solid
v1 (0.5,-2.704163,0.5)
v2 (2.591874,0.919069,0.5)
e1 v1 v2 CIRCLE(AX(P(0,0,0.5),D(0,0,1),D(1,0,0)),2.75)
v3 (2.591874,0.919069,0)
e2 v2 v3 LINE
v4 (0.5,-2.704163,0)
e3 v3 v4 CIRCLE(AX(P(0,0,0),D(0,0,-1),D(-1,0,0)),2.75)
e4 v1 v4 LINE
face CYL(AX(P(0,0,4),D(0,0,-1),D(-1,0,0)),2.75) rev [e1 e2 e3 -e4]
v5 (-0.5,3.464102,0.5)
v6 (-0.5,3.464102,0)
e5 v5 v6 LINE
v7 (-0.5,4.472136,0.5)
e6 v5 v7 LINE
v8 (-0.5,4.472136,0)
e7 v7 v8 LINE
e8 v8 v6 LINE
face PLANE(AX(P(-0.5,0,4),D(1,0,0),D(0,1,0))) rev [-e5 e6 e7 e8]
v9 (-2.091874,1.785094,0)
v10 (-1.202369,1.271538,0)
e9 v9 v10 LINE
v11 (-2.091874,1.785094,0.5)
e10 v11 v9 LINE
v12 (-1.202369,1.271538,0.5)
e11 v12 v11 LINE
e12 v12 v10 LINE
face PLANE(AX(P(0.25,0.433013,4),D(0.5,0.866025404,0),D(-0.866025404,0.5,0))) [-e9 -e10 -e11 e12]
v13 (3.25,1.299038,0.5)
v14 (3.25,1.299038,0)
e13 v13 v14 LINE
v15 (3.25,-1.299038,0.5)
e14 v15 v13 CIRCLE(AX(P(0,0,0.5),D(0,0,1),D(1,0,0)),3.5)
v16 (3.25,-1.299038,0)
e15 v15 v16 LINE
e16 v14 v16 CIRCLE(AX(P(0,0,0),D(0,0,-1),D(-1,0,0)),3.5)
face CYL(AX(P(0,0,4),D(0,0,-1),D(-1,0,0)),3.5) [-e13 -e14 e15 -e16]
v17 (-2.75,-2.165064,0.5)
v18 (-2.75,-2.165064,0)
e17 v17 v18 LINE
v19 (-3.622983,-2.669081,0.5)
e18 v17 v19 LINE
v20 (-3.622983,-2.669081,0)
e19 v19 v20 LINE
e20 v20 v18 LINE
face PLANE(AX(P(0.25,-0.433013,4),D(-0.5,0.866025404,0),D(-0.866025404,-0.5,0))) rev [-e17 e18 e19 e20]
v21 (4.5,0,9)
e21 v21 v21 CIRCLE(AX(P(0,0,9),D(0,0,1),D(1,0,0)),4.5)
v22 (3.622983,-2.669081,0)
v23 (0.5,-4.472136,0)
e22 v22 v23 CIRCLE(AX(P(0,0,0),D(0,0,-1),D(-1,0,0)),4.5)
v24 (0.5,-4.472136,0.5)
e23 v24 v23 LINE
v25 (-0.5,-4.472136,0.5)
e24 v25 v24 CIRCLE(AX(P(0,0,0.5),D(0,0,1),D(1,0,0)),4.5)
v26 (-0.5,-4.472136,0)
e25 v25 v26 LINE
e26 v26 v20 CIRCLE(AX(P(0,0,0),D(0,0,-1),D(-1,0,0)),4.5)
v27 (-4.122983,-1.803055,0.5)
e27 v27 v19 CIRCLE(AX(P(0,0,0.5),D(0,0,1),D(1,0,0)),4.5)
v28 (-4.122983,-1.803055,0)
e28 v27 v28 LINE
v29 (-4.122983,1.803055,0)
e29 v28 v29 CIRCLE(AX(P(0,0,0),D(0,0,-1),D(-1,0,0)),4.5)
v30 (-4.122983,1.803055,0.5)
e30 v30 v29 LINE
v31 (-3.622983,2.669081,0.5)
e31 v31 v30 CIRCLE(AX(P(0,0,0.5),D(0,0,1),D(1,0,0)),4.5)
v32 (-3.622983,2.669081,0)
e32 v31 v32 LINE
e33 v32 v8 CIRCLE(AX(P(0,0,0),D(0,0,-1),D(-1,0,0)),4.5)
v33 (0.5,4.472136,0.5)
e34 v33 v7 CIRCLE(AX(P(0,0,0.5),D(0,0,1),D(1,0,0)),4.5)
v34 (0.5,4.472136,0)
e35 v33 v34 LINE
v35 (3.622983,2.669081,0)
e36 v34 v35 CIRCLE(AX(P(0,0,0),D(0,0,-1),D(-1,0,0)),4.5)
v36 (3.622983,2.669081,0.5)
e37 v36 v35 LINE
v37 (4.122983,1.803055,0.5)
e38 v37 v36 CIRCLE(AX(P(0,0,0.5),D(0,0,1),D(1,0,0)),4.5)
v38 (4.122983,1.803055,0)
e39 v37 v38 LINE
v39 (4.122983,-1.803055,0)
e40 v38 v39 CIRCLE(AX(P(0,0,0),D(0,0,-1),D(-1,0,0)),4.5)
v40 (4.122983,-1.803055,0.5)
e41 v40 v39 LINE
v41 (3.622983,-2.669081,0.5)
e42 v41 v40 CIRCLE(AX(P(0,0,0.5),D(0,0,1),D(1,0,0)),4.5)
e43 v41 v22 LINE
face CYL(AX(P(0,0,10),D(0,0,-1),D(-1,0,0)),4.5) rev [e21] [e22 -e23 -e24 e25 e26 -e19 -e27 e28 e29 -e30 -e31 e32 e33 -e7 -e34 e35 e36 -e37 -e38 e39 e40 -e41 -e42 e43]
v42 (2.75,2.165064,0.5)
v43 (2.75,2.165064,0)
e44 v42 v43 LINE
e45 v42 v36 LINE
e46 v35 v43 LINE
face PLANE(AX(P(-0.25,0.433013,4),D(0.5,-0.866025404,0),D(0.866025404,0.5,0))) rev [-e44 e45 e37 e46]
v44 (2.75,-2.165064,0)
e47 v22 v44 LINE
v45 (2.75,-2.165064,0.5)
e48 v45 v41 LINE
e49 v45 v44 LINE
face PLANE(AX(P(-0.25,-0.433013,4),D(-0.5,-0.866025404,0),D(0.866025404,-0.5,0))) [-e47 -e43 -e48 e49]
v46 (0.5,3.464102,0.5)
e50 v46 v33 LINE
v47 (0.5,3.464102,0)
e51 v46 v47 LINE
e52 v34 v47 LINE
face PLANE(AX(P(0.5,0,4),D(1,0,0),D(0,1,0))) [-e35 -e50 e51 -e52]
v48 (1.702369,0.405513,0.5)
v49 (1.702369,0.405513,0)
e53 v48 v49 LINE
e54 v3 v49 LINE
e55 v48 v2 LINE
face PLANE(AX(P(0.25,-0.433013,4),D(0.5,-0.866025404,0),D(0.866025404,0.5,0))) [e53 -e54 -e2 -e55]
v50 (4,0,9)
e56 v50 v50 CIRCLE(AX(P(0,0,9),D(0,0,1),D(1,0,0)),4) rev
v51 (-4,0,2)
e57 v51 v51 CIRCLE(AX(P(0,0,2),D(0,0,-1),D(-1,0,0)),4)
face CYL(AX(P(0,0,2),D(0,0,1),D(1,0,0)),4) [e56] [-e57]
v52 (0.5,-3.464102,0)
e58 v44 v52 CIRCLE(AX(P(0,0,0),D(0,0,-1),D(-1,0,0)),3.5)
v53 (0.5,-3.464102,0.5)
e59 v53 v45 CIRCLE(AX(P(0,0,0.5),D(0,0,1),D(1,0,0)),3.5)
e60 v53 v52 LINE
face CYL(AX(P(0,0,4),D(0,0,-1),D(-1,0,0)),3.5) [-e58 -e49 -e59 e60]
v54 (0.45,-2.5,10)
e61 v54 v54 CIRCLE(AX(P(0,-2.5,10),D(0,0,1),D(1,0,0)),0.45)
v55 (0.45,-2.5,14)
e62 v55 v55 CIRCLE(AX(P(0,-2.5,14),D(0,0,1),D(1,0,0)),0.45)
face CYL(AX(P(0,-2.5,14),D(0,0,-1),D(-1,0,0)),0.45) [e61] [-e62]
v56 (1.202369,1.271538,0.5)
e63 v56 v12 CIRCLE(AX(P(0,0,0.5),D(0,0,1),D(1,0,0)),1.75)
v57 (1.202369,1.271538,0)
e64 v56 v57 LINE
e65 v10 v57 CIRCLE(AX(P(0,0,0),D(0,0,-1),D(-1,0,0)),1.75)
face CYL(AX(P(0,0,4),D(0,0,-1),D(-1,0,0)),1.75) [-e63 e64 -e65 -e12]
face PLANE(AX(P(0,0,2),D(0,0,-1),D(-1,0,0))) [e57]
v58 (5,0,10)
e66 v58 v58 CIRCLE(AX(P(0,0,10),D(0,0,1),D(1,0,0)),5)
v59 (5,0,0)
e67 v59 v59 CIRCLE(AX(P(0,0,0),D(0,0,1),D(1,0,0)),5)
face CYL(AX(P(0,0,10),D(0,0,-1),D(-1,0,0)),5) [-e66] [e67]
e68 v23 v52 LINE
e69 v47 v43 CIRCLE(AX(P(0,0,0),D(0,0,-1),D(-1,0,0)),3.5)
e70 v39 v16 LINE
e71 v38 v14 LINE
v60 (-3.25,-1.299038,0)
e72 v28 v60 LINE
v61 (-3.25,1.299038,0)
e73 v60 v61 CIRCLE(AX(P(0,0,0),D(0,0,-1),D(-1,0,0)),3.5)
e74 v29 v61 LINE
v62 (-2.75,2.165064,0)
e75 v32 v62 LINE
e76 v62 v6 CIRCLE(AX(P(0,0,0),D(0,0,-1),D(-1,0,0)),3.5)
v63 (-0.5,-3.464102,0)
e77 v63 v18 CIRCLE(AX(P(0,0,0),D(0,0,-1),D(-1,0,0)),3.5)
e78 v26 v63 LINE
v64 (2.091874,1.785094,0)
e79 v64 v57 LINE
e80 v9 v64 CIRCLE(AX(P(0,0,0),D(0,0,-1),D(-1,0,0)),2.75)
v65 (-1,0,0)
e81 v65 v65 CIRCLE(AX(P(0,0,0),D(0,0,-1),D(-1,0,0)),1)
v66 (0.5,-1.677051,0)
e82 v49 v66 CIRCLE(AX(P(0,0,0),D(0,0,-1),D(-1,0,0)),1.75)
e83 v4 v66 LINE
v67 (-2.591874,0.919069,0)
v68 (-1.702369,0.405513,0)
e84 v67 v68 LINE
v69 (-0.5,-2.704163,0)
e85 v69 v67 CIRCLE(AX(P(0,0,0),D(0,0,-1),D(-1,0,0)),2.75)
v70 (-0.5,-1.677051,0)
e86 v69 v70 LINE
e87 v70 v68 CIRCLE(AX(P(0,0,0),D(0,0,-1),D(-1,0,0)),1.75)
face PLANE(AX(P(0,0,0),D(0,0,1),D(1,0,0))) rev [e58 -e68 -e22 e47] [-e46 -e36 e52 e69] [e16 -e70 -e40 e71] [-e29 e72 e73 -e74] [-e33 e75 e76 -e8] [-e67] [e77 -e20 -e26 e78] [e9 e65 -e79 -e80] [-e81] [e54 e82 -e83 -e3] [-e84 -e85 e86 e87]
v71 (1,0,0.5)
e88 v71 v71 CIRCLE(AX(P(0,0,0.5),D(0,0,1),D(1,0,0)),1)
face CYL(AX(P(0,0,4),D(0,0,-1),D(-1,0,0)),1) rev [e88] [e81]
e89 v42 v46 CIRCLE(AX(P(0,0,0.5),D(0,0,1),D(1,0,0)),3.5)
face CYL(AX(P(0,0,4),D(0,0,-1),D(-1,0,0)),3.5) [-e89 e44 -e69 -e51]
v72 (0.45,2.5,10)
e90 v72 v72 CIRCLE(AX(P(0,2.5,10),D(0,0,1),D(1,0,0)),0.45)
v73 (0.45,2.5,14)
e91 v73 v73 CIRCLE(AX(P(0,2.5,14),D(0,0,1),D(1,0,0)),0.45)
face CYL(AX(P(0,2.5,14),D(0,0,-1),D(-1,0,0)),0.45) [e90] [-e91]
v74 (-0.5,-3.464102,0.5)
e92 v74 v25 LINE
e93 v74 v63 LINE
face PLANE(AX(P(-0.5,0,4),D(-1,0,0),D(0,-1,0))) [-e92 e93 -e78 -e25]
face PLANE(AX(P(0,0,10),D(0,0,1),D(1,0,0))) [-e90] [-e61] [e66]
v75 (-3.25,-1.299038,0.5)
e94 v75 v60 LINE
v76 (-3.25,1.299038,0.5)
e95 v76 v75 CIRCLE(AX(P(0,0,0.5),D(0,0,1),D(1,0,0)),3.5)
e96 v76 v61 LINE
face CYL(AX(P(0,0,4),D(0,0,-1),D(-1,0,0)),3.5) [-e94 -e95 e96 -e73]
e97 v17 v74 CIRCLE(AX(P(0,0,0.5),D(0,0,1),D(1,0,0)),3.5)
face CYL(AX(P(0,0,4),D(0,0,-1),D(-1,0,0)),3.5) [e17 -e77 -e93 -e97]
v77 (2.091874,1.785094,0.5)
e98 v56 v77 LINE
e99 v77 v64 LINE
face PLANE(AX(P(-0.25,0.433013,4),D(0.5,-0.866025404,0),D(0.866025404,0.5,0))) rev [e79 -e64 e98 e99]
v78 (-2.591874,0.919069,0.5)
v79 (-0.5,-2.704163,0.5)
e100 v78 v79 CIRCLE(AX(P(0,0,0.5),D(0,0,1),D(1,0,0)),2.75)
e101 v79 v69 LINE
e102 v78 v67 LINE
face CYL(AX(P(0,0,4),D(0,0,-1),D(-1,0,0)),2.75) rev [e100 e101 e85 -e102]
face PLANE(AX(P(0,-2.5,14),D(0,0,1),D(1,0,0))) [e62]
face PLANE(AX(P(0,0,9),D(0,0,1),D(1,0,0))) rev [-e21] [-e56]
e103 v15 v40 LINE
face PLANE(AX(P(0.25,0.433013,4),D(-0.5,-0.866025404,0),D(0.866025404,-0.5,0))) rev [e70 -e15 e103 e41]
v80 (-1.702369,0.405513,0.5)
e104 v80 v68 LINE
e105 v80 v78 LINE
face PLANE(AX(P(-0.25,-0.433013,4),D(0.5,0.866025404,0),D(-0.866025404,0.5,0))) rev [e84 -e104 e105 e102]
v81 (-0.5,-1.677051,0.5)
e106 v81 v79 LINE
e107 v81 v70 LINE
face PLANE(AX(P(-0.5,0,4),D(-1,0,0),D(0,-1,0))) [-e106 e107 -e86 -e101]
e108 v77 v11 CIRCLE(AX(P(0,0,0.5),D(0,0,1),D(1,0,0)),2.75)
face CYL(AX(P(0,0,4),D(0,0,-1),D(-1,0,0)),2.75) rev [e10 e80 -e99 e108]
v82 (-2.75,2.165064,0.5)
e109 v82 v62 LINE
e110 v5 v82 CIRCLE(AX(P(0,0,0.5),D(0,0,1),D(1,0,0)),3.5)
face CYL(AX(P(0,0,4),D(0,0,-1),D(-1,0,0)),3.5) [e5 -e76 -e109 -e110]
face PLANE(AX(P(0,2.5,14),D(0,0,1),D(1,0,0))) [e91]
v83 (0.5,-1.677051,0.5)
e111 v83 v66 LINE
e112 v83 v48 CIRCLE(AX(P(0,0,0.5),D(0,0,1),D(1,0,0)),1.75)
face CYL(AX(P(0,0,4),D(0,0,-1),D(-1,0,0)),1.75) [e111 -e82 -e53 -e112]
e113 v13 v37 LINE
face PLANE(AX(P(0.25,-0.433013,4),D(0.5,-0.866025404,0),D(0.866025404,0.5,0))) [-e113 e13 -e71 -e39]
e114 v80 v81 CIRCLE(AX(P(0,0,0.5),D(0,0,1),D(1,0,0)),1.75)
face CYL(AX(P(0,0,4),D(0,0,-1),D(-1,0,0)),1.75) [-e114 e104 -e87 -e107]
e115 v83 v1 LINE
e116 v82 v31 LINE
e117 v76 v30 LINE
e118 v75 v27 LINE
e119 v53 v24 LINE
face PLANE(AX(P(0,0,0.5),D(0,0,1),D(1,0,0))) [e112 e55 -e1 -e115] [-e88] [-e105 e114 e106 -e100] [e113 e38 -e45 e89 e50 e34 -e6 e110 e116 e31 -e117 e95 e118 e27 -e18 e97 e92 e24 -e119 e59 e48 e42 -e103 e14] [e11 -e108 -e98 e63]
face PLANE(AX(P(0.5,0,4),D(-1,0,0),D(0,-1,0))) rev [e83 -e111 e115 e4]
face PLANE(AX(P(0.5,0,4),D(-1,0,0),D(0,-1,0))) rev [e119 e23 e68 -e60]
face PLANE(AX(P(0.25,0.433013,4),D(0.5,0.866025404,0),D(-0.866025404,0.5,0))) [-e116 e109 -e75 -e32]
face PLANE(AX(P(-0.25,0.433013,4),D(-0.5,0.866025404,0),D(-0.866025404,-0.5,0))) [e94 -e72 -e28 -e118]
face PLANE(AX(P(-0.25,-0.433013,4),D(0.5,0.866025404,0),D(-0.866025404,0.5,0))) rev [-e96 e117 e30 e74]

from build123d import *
from build123d.topology import SkipClean

# Parameters (mm, degrees)
SKETCH1_R           = 5
BOSS_EXTRUDE1_DEPTH = 10
SKETCH2_R           = 0.45
BOSS_EXTRUDE2_DEPTH = 4
SHELL1_START        = 0.5
SHELL1_OUTLINE_R    = 4.5
SHELL1_DEPTH        = 8.5
SKETCH4_R           = 1
CUT_EXTRUDE2_DEPTH  = 4
SKETCH5_R           = 4
BOSS_EXTRUDE3_DEPTH = 7


# Read off the part's stored shape, not the designer's step: Shell1
with BuildPart() as part:
    # Sketch1 → Boss-Extrude1 (new body)
    with BuildSketch(Plane.XY):
        Circle(SKETCH1_R)
    extrude(amount=BOSS_EXTRUDE1_DEPTH)

    # Sketch2 → Boss-Extrude2 (add)
    with BuildSketch(Plane.XY.offset(10)):
        with Locations((0, 2.5)):
            Circle(SKETCH2_R)
        with Locations((0, -2.5)):
            Circle(SKETCH2_R)
    extrude(amount=BOSS_EXTRUDE2_DEPTH)

    # Shell1 outline → Shell1 (cut)
    with BuildSketch(Plane.XY.offset(SHELL1_START)):
        Circle(SHELL1_OUTLINE_R)
    extrude(amount=SHELL1_DEPTH, mode=Mode.SUBTRACT)

    # Sketch4 → Cut-Extrude2 (cut)
    with SkipClean():  # the faces are left unmerged after this step: merging them gives an invalid solid
        with BuildSketch(Plane(origin=(0, 0, 0), x_dir=(-1, 0, 0), z_dir=(0, 0, -1))):
            with BuildLine():
                ThreePointArc((-2.75, 2.165063509), (-1.75, 3.031088913), (-0.5, 3.464101615))
                Line((-0.5, 3.464101615), (-0.5, 4.472135955))
                ThreePointArc((-0.5, 4.472135955), (-2.25, 3.897114317), (-3.622983346, 2.669080679))
                Line((-3.622983346, 2.669080679), (-2.75, 2.165063509))
            make_face()
            with BuildLine():
                ThreePointArc((0.5, 3.464101615), (1.75, 3.031088913), (2.75, 2.165063509))
                Line((2.75, 2.165063509), (3.622983346, 2.669080679))
                ThreePointArc((3.622983346, 2.669080679), (2.25, 3.897114317), (0.5, 4.472135955))
                Line((0.5, 4.472135955), (0.5, 3.464101615))
            make_face()
            with BuildLine():
                ThreePointArc((0.5, 1.677050983), (0.875, 1.515544457), (1.202368755, 1.271538193))
                Line((1.202368755, 1.271538193), (2.091874249, 1.78509443))
                ThreePointArc((2.091874249, 1.78509443), (1.375, 2.38156986), (0.5, 2.704163457))
                Line((0.5, 2.704163457), (0.5, 1.677050983))
            make_face()
            with BuildLine():
                ThreePointArc((-1.202368755, 1.271538193), (-0.875, 1.515544457), (-0.5, 1.677050983))
                Line((-0.5, 1.677050983), (-0.5, 2.704163457))
                ThreePointArc((-0.5, 2.704163457), (-1.375, 2.38156986), (-2.091874249, 1.78509443))
                Line((-2.091874249, 1.78509443), (-1.202368755, 1.271538193))
            make_face()
            Circle(SKETCH4_R)
            with BuildLine():
                ThreePointArc((-1.702368755, -0.40551279), (-1.75, 0), (-1.702368755, 0.40551279))
                Line((-1.702368755, 0.40551279), (-2.591874249, 0.919069026))
                ThreePointArc((-2.591874249, 0.919069026), (-2.75, 0), (-2.591874249, -0.919069026))
                Line((-2.591874249, -0.919069026), (-1.702368755, -0.40551279))
            make_face()
            with BuildLine():
                Line((-0.5, -2.704163457), (-0.5, -1.677050983))
                ThreePointArc((-0.5, -1.677050983), (-0.875, -1.515544457), (-1.202368755, -1.271538193))
                Line((-1.202368755, -1.271538193), (-2.091874249, -1.78509443))
                ThreePointArc((-2.091874249, -1.78509443), (-1.375, -2.38156986), (-0.5, -2.704163457))
            make_face()
            with BuildLine():
                Line((2.091874249, -1.78509443), (1.202368755, -1.271538193))
                ThreePointArc((1.202368755, -1.271538193), (0.875, -1.515544457), (0.5, -1.677050983))
                Line((0.5, -1.677050983), (0.5, -2.704163457))
                ThreePointArc((0.5, -2.704163457), (1.375, -2.38156986), (2.091874249, -1.78509443))
            make_face()
            with BuildLine():
                Line((2.591874249, 0.919069026), (1.702368755, 0.40551279))
                ThreePointArc((1.702368755, 0.40551279), (1.738051398, 0.204150287), (1.75, 0))
                ThreePointArc((1.75, 0), (1.738051398, -0.204150287), (1.702368755, -0.40551279))
                Line((1.702368755, -0.40551279), (2.591874249, -0.919069026))
                ThreePointArc((2.591874249, -0.919069026), (2.710180269, -0.466286293), (2.75, 0))
                ThreePointArc((2.75, 0), (2.710180269, 0.466286293), (2.591874249, 0.919069026))
            make_face()
            with BuildLine():
                Line((2.591874249, -0.919069026), (1.702368755, -0.40551279))
                ThreePointArc((1.702368755, -0.40551279), (1.515544457, -0.875), (1.202368755, -1.271538193))
                Line((1.202368755, -1.271538193), (2.091874249, -1.78509443))
                ThreePointArc((2.091874249, -1.78509443), (2.38156986, -1.375), (2.591874249, -0.919069026))
            make_face()
            with BuildLine():
                ThreePointArc((-1.202368755, -1.271538193), (-1.515544457, -0.875), (-1.702368755, -0.40551279))
                Line((-1.702368755, -0.40551279), (-2.591874249, -0.919069026))
                ThreePointArc((-2.591874249, -0.919069026), (-2.38156986, -1.375), (-2.091874249, -1.78509443))
                Line((-2.091874249, -1.78509443), (-1.202368755, -1.271538193))
            make_face()
            with BuildLine():
                ThreePointArc((-0.5, 1.677050983), (0, 1.75), (0.5, 1.677050983))
                Line((0.5, 1.677050983), (0.5, 2.704163457))
                ThreePointArc((0.5, 2.704163457), (0, 2.75), (-0.5, 2.704163457))
                Line((-0.5, 2.704163457), (-0.5, 1.677050983))
            make_face()
            with BuildLine():
                Line((4.122983346, 1.803055276), (3.25, 1.299038106))
                ThreePointArc((3.25, 1.299038106), (3.436931771, 0.661437828), (3.5, 0))
                ThreePointArc((3.5, 0), (3.436931771, -0.661437828), (3.25, -1.299038106))
                Line((3.25, -1.299038106), (4.122983346, -1.803055276))
                ThreePointArc((4.122983346, -1.803055276), (4.40473751, -0.921025228), (4.5, 0))
                ThreePointArc((4.5, 0), (4.40473751, 0.921025228), (4.122983346, 1.803055276))
            make_face()
            with BuildLine():
                Line((3.622983346, -2.669080679), (2.75, -2.165063509))
                ThreePointArc((2.75, -2.165063509), (1.75, -3.031088913), (0.5, -3.464101615))
                Line((0.5, -3.464101615), (0.5, -4.472135955))
                ThreePointArc((0.5, -4.472135955), (2.25, -3.897114317), (3.622983346, -2.669080679))
            make_face()
            with BuildLine():
                Line((-0.5, -4.472135955), (-0.5, -3.464101615))
                ThreePointArc((-0.5, -3.464101615), (-1.75, -3.031088913), (-2.75, -2.165063509))
                Line((-2.75, -2.165063509), (-3.622983346, -2.669080679))
                ThreePointArc((-3.622983346, -2.669080679), (-2.25, -3.897114317), (-0.5, -4.472135955))
            make_face()
            with BuildLine():
                ThreePointArc((-3.25, -1.299038106), (-3.5, 0), (-3.25, 1.299038106))
                Line((-3.25, 1.299038106), (-4.122983346, 1.803055276))
                ThreePointArc((-4.122983346, 1.803055276), (-4.5, 0), (-4.122983346, -1.803055276))
                Line((-4.122983346, -1.803055276), (-3.25, -1.299038106))
            make_face()
        extrude(amount=-CUT_EXTRUDE2_DEPTH, mode=Mode.SUBTRACT)

    # Sketch5 → Boss-Extrude3 (add)
    with SkipClean():  # the faces are left unmerged after this step: merging them gives an invalid solid
        with BuildSketch(Plane(origin=(0, 0, 9), x_dir=(-1, 0, 0), z_dir=(0, 0, -1))):
            with Locations(Location((0, 0, 0), (0, 0, 180))):
                Circle(SKETCH5_R)
        extrude(amount=BOSS_EXTRUDE3_DEPTH)


solid = part.part
